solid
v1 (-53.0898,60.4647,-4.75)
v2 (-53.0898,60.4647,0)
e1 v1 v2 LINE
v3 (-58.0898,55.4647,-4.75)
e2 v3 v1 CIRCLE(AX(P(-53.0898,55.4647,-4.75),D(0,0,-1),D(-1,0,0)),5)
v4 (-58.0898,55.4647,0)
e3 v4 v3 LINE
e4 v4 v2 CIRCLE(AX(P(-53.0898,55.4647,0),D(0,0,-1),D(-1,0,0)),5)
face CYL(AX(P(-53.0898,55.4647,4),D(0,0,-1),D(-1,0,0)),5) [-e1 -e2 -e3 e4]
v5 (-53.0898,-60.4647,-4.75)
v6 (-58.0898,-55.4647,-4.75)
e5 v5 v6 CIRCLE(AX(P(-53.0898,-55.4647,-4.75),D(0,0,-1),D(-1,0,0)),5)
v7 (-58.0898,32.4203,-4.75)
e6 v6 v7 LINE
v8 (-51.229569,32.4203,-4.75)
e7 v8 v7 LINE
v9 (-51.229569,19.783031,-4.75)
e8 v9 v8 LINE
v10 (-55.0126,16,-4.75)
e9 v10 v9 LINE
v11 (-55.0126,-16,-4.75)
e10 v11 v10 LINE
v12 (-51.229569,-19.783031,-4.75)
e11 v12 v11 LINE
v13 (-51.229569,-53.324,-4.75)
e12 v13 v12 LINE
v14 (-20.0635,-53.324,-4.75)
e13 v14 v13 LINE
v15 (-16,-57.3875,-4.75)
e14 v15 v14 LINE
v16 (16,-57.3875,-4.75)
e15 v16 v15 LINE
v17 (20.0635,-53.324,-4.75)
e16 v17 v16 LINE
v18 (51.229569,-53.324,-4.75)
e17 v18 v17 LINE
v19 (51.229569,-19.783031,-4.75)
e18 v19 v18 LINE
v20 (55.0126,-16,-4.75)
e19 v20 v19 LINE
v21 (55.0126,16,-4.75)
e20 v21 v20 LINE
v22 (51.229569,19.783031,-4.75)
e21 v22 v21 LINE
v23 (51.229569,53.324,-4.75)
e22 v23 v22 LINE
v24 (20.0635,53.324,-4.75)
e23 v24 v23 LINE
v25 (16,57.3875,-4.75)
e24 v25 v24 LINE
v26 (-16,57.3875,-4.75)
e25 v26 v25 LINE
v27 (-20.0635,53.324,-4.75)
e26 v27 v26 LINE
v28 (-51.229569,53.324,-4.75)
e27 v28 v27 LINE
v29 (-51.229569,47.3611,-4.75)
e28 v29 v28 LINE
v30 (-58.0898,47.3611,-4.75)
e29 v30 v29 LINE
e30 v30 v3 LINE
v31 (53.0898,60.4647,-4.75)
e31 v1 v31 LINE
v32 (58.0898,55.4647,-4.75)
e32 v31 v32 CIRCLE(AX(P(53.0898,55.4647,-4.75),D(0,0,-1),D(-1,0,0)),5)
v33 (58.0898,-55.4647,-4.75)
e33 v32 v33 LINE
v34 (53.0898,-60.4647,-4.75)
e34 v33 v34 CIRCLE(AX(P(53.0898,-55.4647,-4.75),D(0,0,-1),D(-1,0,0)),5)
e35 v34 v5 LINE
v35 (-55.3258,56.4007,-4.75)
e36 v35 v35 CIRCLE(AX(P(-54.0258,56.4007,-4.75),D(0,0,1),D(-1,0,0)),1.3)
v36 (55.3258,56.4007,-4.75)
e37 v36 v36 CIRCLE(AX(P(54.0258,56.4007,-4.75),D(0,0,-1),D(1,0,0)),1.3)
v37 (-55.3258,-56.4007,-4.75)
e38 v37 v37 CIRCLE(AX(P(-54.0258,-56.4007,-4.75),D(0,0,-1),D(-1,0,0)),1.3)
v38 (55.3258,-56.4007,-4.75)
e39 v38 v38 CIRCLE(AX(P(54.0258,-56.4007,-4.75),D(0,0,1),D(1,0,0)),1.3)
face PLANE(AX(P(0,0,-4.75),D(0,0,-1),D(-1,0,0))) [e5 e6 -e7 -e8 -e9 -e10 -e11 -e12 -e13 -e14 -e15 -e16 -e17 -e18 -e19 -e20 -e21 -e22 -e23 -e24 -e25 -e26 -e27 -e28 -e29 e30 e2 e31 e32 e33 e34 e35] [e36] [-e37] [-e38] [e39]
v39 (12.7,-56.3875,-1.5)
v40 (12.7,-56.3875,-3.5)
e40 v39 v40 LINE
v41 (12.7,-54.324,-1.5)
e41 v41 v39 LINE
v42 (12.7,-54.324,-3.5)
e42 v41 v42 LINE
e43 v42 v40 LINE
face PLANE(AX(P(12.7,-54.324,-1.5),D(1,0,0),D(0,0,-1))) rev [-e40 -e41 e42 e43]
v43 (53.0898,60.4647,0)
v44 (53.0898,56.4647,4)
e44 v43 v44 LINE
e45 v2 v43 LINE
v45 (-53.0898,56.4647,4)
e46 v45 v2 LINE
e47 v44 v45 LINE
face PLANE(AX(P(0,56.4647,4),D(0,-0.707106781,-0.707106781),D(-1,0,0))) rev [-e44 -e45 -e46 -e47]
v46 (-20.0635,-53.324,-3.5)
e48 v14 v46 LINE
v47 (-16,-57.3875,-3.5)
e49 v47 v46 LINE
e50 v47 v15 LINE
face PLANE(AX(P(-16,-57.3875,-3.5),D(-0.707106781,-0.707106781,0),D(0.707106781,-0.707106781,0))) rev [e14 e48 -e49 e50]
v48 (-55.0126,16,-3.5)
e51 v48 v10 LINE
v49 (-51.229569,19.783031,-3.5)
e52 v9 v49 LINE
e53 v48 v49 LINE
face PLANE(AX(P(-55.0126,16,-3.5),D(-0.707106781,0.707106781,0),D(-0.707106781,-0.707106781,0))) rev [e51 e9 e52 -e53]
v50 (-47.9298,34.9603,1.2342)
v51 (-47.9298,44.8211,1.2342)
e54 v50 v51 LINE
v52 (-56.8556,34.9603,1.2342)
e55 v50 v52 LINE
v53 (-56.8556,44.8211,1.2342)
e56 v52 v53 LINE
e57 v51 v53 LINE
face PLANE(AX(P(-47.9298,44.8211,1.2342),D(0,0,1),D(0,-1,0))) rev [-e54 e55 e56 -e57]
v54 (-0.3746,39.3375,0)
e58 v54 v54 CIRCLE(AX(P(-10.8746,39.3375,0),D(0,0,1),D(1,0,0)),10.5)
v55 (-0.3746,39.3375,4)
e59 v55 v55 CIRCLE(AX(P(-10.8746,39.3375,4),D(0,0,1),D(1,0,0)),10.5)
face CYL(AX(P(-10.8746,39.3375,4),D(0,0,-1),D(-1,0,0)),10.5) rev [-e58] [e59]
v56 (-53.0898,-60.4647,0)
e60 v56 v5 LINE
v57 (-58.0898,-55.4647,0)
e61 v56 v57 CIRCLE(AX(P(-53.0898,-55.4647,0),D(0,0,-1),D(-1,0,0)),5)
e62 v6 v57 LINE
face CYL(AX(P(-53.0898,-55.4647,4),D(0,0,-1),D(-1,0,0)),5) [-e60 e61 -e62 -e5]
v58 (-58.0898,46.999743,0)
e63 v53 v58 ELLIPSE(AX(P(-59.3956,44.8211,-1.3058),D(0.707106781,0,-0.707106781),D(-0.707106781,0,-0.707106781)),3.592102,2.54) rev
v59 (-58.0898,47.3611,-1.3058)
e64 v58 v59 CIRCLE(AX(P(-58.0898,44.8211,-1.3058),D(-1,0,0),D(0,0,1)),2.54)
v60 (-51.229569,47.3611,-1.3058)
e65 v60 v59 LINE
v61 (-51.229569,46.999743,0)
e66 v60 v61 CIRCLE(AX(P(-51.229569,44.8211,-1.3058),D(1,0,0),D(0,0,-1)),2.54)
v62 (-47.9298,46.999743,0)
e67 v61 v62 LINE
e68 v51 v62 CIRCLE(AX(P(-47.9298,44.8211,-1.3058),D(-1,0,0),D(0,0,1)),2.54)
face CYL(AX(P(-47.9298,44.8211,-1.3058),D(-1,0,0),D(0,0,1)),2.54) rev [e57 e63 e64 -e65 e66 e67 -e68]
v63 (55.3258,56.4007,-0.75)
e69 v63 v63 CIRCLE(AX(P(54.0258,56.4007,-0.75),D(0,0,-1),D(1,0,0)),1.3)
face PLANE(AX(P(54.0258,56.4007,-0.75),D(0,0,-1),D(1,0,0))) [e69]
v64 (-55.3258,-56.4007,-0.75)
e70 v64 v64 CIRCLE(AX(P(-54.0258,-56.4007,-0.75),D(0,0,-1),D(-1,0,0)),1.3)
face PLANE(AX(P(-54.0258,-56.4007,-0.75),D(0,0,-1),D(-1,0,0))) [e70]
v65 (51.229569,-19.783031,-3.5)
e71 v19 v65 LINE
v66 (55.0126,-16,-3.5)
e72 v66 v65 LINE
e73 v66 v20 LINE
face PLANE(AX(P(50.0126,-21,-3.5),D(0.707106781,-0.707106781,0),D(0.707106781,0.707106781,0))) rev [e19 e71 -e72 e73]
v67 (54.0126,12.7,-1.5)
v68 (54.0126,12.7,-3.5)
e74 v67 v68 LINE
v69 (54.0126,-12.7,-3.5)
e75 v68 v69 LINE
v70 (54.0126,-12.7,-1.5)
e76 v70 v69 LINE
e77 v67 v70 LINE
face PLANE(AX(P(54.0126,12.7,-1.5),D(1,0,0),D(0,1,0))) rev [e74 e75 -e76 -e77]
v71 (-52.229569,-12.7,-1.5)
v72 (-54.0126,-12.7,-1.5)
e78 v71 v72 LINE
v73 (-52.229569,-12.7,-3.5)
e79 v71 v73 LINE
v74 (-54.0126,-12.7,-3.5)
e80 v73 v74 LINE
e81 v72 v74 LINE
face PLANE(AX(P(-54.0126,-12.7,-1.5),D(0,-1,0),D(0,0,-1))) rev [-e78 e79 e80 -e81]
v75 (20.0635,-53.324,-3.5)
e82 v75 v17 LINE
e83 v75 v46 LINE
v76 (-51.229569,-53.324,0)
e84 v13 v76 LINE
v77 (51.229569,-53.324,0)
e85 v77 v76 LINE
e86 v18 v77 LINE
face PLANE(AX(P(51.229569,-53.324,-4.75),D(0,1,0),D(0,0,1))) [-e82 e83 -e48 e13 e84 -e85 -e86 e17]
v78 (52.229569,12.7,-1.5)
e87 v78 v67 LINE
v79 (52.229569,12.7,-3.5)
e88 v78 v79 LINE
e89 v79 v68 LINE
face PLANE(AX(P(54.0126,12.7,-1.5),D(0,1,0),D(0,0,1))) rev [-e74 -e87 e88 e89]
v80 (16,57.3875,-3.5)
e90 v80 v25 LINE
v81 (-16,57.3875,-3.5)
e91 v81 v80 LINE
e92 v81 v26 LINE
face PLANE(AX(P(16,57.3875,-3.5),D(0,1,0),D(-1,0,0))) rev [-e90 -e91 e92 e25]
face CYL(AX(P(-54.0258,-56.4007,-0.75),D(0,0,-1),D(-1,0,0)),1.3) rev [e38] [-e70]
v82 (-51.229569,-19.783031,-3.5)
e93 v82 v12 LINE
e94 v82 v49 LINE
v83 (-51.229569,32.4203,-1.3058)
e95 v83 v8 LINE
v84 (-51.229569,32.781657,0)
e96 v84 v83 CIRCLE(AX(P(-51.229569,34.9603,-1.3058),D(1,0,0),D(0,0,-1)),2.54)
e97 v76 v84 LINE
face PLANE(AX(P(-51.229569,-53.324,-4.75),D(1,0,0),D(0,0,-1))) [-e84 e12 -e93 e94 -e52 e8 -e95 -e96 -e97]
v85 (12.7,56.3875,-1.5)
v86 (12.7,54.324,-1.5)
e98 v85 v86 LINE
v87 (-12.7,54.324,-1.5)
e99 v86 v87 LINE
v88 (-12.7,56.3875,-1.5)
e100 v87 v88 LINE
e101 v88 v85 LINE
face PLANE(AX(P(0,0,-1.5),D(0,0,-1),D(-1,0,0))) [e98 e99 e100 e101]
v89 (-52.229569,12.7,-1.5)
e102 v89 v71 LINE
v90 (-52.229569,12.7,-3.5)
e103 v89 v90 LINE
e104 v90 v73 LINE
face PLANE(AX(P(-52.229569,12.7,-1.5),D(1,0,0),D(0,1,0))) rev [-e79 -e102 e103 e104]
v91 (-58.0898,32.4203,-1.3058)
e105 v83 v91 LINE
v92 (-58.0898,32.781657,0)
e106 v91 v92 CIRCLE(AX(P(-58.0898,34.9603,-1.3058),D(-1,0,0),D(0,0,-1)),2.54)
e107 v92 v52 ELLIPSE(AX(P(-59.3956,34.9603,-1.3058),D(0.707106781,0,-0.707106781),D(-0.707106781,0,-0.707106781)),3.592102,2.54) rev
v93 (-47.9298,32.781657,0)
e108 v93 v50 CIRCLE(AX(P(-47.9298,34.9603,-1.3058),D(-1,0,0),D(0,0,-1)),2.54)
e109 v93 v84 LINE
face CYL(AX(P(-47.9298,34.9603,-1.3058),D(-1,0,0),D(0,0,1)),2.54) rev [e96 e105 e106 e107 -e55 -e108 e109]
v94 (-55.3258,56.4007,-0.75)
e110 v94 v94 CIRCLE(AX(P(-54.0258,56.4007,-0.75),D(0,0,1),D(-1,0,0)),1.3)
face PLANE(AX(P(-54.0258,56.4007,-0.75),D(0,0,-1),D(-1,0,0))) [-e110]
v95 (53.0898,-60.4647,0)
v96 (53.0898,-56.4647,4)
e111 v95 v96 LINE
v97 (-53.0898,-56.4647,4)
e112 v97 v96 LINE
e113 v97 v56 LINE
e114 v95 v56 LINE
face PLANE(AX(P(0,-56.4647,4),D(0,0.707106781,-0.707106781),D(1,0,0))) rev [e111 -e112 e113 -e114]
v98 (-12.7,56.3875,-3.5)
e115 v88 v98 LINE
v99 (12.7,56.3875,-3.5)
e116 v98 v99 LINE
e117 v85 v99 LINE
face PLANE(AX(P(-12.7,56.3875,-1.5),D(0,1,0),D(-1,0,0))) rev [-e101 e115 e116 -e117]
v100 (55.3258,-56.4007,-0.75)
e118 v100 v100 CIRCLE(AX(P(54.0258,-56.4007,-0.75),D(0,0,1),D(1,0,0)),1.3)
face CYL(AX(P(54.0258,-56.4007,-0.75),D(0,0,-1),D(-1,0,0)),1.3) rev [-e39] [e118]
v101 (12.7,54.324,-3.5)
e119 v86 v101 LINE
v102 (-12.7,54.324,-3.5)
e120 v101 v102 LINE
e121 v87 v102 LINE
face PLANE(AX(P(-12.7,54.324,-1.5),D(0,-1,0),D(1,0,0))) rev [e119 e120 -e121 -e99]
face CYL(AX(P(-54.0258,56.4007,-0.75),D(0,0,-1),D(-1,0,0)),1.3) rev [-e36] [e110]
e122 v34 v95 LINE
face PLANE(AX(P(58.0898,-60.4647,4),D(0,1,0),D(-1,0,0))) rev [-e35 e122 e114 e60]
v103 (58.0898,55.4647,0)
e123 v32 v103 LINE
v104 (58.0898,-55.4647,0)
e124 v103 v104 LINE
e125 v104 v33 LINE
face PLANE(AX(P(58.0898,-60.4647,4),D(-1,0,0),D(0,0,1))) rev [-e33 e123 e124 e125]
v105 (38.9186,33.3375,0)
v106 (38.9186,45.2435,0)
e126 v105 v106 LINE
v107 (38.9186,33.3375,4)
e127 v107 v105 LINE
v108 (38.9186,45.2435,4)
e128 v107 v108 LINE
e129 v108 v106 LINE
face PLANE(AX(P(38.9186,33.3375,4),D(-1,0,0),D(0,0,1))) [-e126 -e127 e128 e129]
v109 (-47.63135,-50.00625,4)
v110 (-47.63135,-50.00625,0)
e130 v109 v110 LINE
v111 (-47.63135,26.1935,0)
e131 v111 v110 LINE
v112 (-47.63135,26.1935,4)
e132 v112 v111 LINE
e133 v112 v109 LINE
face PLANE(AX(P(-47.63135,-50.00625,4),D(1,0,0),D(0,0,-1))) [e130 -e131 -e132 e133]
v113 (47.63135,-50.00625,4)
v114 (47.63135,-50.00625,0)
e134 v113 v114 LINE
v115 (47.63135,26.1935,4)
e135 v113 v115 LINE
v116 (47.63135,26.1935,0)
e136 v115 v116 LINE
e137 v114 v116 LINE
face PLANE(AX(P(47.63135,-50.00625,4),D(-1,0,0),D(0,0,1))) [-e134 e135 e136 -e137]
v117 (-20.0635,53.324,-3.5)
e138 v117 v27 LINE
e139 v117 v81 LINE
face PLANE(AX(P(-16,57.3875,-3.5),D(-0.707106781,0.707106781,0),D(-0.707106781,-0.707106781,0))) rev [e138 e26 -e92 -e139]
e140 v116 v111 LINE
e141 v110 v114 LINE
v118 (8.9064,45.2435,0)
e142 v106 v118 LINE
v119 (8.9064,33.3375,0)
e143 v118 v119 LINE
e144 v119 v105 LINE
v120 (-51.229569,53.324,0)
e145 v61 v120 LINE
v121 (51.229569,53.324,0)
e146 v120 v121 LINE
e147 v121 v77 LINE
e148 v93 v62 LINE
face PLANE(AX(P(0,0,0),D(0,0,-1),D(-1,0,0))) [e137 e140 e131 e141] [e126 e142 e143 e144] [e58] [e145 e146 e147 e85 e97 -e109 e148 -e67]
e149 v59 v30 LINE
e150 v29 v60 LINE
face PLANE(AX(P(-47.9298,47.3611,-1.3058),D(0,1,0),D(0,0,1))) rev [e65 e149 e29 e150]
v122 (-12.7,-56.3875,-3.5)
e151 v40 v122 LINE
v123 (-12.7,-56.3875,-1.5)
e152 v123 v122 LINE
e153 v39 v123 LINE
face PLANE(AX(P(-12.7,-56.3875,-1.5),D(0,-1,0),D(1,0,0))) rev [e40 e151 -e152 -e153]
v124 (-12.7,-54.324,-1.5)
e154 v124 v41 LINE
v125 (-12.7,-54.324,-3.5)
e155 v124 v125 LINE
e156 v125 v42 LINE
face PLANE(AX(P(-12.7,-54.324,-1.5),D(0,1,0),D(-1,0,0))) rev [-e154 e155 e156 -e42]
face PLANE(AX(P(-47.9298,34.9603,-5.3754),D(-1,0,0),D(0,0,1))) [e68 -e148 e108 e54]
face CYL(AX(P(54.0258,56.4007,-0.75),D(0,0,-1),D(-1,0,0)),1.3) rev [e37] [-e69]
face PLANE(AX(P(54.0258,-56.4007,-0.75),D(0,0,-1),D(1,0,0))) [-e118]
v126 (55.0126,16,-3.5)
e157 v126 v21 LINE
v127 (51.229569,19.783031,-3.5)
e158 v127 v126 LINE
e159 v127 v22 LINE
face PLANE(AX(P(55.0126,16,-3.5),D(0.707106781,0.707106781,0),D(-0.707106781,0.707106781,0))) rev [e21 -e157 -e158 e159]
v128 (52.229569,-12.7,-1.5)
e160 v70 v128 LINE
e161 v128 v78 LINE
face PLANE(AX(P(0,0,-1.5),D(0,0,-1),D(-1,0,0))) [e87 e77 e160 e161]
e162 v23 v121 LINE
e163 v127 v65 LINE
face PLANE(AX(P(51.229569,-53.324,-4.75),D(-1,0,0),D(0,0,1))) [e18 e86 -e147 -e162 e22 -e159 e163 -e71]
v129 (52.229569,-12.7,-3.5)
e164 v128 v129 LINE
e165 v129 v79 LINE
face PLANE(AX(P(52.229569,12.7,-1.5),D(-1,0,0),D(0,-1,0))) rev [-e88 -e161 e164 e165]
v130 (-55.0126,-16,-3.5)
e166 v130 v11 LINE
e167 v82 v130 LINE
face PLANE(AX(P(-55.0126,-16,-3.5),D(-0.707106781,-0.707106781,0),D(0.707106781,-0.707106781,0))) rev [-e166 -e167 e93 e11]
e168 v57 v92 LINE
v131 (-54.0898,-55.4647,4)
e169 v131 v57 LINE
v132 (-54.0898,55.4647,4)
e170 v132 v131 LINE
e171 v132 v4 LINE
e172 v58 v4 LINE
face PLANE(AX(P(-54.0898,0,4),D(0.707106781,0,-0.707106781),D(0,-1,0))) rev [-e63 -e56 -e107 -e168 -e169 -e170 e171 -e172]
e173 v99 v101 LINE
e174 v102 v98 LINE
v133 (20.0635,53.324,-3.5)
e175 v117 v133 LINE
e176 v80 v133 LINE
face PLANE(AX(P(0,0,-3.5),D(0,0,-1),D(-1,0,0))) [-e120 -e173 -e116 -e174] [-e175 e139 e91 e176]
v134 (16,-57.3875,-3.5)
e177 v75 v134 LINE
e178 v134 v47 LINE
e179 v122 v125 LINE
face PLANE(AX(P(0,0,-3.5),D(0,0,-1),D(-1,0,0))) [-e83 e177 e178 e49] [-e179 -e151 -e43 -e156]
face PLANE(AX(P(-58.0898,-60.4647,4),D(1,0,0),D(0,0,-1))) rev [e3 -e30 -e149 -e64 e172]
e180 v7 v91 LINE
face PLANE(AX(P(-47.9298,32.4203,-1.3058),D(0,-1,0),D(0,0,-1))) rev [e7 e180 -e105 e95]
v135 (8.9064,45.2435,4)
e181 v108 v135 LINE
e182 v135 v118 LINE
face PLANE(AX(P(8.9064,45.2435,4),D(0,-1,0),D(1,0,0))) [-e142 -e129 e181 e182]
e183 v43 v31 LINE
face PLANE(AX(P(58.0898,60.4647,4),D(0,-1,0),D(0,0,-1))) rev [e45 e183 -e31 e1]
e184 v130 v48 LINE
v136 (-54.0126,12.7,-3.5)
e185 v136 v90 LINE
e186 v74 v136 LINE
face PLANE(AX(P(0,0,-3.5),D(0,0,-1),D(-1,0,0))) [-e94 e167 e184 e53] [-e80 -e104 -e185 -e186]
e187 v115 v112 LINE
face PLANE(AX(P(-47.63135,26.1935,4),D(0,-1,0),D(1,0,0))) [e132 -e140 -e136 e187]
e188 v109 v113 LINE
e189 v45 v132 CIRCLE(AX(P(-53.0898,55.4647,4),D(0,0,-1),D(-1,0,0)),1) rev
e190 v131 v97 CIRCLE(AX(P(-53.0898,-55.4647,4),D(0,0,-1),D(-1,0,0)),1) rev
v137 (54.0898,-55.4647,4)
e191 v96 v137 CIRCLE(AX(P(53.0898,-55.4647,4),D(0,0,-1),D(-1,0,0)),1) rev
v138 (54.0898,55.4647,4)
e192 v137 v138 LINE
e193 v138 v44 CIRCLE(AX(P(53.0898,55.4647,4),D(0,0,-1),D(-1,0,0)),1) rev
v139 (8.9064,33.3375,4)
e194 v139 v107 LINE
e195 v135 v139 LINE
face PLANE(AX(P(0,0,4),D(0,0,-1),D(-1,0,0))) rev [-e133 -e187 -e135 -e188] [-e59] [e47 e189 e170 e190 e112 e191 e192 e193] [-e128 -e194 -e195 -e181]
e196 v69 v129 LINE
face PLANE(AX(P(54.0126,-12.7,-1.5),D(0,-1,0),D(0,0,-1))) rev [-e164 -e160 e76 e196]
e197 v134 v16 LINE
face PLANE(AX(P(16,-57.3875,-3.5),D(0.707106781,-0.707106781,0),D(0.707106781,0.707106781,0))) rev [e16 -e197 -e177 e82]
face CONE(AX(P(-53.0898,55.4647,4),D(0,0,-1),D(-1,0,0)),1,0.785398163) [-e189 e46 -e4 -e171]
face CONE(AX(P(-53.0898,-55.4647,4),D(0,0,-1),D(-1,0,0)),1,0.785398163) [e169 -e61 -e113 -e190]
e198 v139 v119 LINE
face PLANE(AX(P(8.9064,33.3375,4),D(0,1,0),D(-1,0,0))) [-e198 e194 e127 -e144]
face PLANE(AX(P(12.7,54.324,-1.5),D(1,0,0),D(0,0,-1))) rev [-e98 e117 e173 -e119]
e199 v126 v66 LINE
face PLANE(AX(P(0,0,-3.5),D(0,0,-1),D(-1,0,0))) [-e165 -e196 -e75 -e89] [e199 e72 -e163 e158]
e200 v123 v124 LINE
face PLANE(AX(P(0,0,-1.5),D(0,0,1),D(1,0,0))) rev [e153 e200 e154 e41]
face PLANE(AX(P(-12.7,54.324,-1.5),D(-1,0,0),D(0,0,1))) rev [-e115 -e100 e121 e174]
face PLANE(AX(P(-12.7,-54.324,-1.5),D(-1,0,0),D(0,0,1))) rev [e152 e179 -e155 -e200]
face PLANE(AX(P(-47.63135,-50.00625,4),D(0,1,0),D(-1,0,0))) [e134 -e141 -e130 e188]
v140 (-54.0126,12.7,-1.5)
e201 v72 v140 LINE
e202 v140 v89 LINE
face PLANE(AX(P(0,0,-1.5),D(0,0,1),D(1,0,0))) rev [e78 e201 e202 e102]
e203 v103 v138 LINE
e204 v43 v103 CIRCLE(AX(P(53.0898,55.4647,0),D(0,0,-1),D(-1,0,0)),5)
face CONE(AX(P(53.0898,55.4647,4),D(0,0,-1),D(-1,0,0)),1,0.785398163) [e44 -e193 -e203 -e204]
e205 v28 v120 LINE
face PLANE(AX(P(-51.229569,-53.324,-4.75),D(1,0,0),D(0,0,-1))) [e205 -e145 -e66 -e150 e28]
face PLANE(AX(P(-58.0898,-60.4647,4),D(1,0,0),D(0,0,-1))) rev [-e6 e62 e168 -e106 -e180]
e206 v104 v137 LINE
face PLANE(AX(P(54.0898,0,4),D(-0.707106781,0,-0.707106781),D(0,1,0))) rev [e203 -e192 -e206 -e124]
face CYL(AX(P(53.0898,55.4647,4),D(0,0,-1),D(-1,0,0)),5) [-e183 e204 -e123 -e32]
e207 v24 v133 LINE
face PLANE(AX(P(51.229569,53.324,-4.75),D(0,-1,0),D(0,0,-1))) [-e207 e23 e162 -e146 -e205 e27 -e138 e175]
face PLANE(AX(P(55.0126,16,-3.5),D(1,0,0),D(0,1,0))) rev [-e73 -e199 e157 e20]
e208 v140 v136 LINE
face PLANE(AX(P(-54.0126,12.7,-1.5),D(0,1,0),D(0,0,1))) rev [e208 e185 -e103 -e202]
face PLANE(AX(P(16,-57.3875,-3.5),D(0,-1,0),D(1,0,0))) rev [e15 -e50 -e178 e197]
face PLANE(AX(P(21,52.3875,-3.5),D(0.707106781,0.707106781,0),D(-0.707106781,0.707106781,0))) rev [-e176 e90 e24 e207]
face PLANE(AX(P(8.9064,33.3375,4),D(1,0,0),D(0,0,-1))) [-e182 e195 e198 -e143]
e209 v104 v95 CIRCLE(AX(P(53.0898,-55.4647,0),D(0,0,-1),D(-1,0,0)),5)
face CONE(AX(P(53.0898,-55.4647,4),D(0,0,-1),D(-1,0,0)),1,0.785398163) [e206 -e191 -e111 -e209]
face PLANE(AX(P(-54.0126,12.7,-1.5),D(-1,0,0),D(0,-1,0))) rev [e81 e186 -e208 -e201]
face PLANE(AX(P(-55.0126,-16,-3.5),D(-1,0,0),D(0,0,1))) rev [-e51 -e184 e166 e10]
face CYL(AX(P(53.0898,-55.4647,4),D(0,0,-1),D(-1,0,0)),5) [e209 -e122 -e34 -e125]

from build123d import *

# Parameters (mm, degrees)
SKETCH1_W                                  = 120.9294
SKETCH1_H                                  = 116.1796
SKETCH1_R                                  = 10.5
SKETCH1_W_2                                = 11.906
SKETCH1_H_2                                = 30.0122
SKETCH1_W_3                                = 76.19975
SKETCH1_H_3                                = 95.2627
BOSS_EXTRUDE1_DEPTH                        = 4
SKETCH2_W                                  = 116.1796
SKETCH2_H                                  = 120.9294
SKETCH2_W_2                                = 102.459137156
SKETCH2_H_2                                = 106.648
BOSS_EXTRUDE2_DEPTH                        = 4.75
CUT_EXTRUDE1_DEPTH                         = 1.25
SKETCH6_W                                  = 25.4
SKETCH6_H                                  = 2.0635
SKETCH6_W_2                                = 1.783031422
SKETCH6_H_2                                = 25.4
CUT_EXTRUDE2_DEPTH                         = 2
CUT_EXTRUDE3_DEPTH                         = 10.16
SKETCH8_R                                  = 1.3
CUT_EXTRUDE4_DEPTH                         = 4
MIRROR1_AT_THE_SECOND_PLANE_COPY_1_SKETC_R = 1.3
MIRROR1_AT_THE_SECOND_PLANE_COPY_1_DEPTH   = 4
FILLET1_R                                  = 5
CHAMFER1_SIZE                              = 4


with BuildPart() as part:
    # Sketch1 → Boss-Extrude1 (new body)
    with BuildSketch(Plane(origin=(0, 0, 0), x_dir=(0, 1, 0), z_dir=(0, 0, 1))):
        Rectangle(SKETCH1_W, SKETCH1_H)
        with Locations(Location((39.3375, 10.8746, 0), (0, 0, 270))):
            Circle(SKETCH1_R, mode=Mode.SUBTRACT)
        with Locations((39.2905, -23.9125)):
            Rectangle(SKETCH1_W_2, SKETCH1_H_2, mode=Mode.SUBTRACT)
        with Locations((-11.906375, 0)):
            Rectangle(SKETCH1_W_3, SKETCH1_H_3, mode=Mode.SUBTRACT)
    extrude(amount=BOSS_EXTRUDE1_DEPTH)

    # Sketch2 → Boss-Extrude2 (add)
    with BuildSketch(Plane(origin=(0, 0, 0), x_dir=(-1, 0, 0), z_dir=(0, 0, -1))):
        Rectangle(SKETCH2_W, SKETCH2_H)
        Rectangle(SKETCH2_W_2, SKETCH2_H_2, mode=Mode.SUBTRACT)
    extrude(amount=BOSS_EXTRUDE2_DEPTH)

    # Sketch4 → Cut-Extrude1 (cut)
    with BuildSketch(Plane(origin=(0, 0, -4.75), x_dir=(-1, 0, 0), z_dir=(0, 0, -1))):
        Polygon((-50.0126, -52.3875), (-21, -52.3875), (-16, -57.3875), (16, -57.3875), (21, -52.3875), (50.0126, -52.3875), (50.0126, -21), (55.0126, -16), (55.0126, 16), (50.0126, 21), (50.0126, 52.3875), (21, 52.3875), (16, 57.3875), (-16, 57.3875), (-21, 52.3875), (-50.0126, 52.3875), (-50.0126, 21), (-55.0126, 16), (-55.0126, -16), (-50.0126, -21), align=None)
    extrude(amount=-CUT_EXTRUDE1_DEPTH, mode=Mode.SUBTRACT)

    # Sketch6 → Cut-Extrude2 (cut)
    with BuildSketch(Plane(origin=(0, 0, -3.5), x_dir=(1, 0, 0), z_dir=(0, 0, -1))):
        with Locations((0, 55.35575)):
            Rectangle(SKETCH6_W, SKETCH6_H)
        with Locations((0, -55.35575)):
            Rectangle(SKETCH6_W, SKETCH6_H)
        with Locations((-53.121084289, 0)):
            Rectangle(SKETCH6_W_2, SKETCH6_H_2)
        with Locations((53.121084289, 0)):
            Rectangle(SKETCH6_W_2, SKETCH6_H_2)
    extrude(amount=-CUT_EXTRUDE2_DEPTH, mode=Mode.SUBTRACT)

    # Sketch7 → Cut-Extrude3 (cut)
    with BuildSketch(Plane(origin=(-58.0898, 0, 0), x_dir=(0, -1, 0), z_dir=(-1, 0, 0))):
        with BuildLine():
            Line((-44.8211, 1.2342), (-34.9603, 1.2342))
            ThreePointArc((-34.9603, 1.2342), (-33.164248776, 0.490251224), (-32.4203, -1.3058))
            Line((-32.4203, -1.3058), (-32.4203, -5.3754))
            ThreePointArc((-32.4203, -5.3754), (-33.164248776, -7.171451224), (-34.9603, -7.9154))
            Line((-34.9603, -7.9154), (-44.8211, -7.9154))
            ThreePointArc((-44.8211, -7.9154), (-46.617151224, -7.171451224), (-47.3611, -5.3754))
            Line((-47.3611, -5.3754), (-47.3611, -1.3058))
            ThreePointArc((-47.3611, -1.3058), (-46.617151224, 0.490251224), (-44.8211, 1.2342))
        make_face()
    extrude(amount=-CUT_EXTRUDE3_DEPTH, mode=Mode.SUBTRACT)

    # Sketch8 → Cut-Extrude4 (cut)
    with BuildSketch(Plane(origin=(0, 0, -4.75), x_dir=(1, 0, 0), z_dir=(0, 0, -1))):
        with Locations(Location((-54.0258, 56.4007, 0), (0, 0, 180))):
            Circle(SKETCH8_R)
    cut_extrude4 = extrude(amount=-CUT_EXTRUDE4_DEPTH, mode=Mode.SUBTRACT)

    # Mirror1: Cut-Extrude4 across plane
    add(cut_extrude4.mirror(Plane(origin=(0, 0, 0), x_dir=(0, 0, 1), z_dir=(1, 0, 0))), mode=Mode.SUBTRACT)

    # Mirror1 at the second plane: Cut-Extrude4 across plane
    add(cut_extrude4.mirror(Plane.ZX), mode=Mode.SUBTRACT)

    # Mirror1 at the second plane copy 1 sketc → Mirror1 at the second plane copy 1 (cut)
    with BuildSketch(Plane(origin=(0, 0, -4.75), x_dir=(-1, 0, 0), z_dir=(0, 0, -1))):
        with Locations(Location((-54.0258, 56.4007, 0), (0, 0, 180))):
            Circle(MIRROR1_AT_THE_SECOND_PLANE_COPY_1_SKETC_R)
    extrude(amount=-MIRROR1_AT_THE_SECOND_PLANE_COPY_1_DEPTH, mode=Mode.SUBTRACT)

    # Fillet1
    fillet1_edges = [part.edges().sort_by_distance(p)[0] for p in [
        (58.0898, 60.4647, -0.375),
        (58.0898, -60.4647, -0.375),
        (-58.0898, -60.4647, -0.375),
        (-58.0898, 60.4647, -0.375),
    ]]
    fillet(fillet1_edges, radius=FILLET1_R)

    # Chamfer1
    # the kernel refuses this chamfer: 4 mm, written as the material it takes off along each edge
    with BuildSketch(Plane(origin=(-53.0898, -60.4647, 4), x_dir=(0, 0.9996219169112968, 0.027495876610586296), z_dir=(1, 0, 0)), Plane(origin=(53.0898, 60.4647, 4), x_dir=(0, -0.9996219169112968, 0.027495876610586296), z_dir=(-1, 0, 0))) as chamfer1_piece_1:
        Polygon((CHAMFER1_SIZE * 0.999621916911, -CHAMFER1_SIZE * 0.0274958766106), (-CHAMFER1_SIZE * 0.0274958766106, -CHAMFER1_SIZE * 0.999621916911), (0, 0), align=None)
    extrude(amount=106.1796, mode=Mode.SUBTRACT)
    with BuildSketch(Plane(origin=(58.0898, -55.4647, 4), x_dir=(0.02749587661058563, 0, -0.9996219169112968), z_dir=(0, 1, 0))) as chamfer1_piece_2:
        Polygon((CHAMFER1_SIZE * 0.999621916911, CHAMFER1_SIZE * 0.0274958766106), (-CHAMFER1_SIZE * 0.0274958766106, CHAMFER1_SIZE * 0.999621916911), (0, 0), align=None)
    extrude(amount=110.9294, mode=Mode.SUBTRACT)
    with BuildSketch(Plane(origin=(-58.0898, 55.4647, 4), x_dir=(0.9996219169112968, 0, 0.027495876610586296), z_dir=(0, -1, 0))) as chamfer1_piece_3:
        Polygon((CHAMFER1_SIZE * 0.999621916911, -CHAMFER1_SIZE * 0.0274958766106), (-CHAMFER1_SIZE * 0.0274958766106, -CHAMFER1_SIZE * 0.999621916911), (0, 0), align=None)
    extrude(amount=110.9294, mode=Mode.SUBTRACT)
    with BuildSketch(Plane(origin=(53.0898, 55.4647, 4), x_dir=(1, 0, 0), z_dir=(0, -1, 0))) as chamfer1_piece_4:
        Polygon((5 - CHAMFER1_SIZE, 0), (5, -CHAMFER1_SIZE), (5, 0), align=None)
    revolve(axis=Axis((53.0898, 55.4647, 4), (0, 0, 1)), revolution_arc=90, mode=Mode.SUBTRACT)
    with BuildSketch(Plane(origin=(53.0898, -55.4647, 4), x_dir=(1, 0, 0), z_dir=(0, 1, 0))) as chamfer1_piece_5:
        Polygon((5 - CHAMFER1_SIZE, 0), (5, CHAMFER1_SIZE), (5, 0), align=None)
    revolve(axis=Axis((53.0898, -55.4647, 4), (0, 0, -1)), revolution_arc=90, mode=Mode.SUBTRACT)
    with BuildSketch(Plane(origin=(-53.0898, 55.4647, 4), x_dir=(0, 1, 0), z_dir=(1, 0, 0))) as chamfer1_piece_6:
        Polygon((5 - CHAMFER1_SIZE, 0), (5, -CHAMFER1_SIZE), (5, 0), align=None)
    revolve(axis=Axis((-53.0898, 55.4647, 4), (0, 0, 1)), revolution_arc=90, mode=Mode.SUBTRACT)
    with BuildSketch(Plane(origin=(-53.0898, -55.4647, 4), x_dir=(0, -1, 0), z_dir=(1, 0, 0))) as chamfer1_piece_7:
        Polygon((5 - CHAMFER1_SIZE, 0), (5, CHAMFER1_SIZE), (5, 0), align=None)
    revolve(axis=Axis((-53.0898, -55.4647, 4), (0, 0, -1)), revolution_arc=90, mode=Mode.SUBTRACT)


solid = part.part
